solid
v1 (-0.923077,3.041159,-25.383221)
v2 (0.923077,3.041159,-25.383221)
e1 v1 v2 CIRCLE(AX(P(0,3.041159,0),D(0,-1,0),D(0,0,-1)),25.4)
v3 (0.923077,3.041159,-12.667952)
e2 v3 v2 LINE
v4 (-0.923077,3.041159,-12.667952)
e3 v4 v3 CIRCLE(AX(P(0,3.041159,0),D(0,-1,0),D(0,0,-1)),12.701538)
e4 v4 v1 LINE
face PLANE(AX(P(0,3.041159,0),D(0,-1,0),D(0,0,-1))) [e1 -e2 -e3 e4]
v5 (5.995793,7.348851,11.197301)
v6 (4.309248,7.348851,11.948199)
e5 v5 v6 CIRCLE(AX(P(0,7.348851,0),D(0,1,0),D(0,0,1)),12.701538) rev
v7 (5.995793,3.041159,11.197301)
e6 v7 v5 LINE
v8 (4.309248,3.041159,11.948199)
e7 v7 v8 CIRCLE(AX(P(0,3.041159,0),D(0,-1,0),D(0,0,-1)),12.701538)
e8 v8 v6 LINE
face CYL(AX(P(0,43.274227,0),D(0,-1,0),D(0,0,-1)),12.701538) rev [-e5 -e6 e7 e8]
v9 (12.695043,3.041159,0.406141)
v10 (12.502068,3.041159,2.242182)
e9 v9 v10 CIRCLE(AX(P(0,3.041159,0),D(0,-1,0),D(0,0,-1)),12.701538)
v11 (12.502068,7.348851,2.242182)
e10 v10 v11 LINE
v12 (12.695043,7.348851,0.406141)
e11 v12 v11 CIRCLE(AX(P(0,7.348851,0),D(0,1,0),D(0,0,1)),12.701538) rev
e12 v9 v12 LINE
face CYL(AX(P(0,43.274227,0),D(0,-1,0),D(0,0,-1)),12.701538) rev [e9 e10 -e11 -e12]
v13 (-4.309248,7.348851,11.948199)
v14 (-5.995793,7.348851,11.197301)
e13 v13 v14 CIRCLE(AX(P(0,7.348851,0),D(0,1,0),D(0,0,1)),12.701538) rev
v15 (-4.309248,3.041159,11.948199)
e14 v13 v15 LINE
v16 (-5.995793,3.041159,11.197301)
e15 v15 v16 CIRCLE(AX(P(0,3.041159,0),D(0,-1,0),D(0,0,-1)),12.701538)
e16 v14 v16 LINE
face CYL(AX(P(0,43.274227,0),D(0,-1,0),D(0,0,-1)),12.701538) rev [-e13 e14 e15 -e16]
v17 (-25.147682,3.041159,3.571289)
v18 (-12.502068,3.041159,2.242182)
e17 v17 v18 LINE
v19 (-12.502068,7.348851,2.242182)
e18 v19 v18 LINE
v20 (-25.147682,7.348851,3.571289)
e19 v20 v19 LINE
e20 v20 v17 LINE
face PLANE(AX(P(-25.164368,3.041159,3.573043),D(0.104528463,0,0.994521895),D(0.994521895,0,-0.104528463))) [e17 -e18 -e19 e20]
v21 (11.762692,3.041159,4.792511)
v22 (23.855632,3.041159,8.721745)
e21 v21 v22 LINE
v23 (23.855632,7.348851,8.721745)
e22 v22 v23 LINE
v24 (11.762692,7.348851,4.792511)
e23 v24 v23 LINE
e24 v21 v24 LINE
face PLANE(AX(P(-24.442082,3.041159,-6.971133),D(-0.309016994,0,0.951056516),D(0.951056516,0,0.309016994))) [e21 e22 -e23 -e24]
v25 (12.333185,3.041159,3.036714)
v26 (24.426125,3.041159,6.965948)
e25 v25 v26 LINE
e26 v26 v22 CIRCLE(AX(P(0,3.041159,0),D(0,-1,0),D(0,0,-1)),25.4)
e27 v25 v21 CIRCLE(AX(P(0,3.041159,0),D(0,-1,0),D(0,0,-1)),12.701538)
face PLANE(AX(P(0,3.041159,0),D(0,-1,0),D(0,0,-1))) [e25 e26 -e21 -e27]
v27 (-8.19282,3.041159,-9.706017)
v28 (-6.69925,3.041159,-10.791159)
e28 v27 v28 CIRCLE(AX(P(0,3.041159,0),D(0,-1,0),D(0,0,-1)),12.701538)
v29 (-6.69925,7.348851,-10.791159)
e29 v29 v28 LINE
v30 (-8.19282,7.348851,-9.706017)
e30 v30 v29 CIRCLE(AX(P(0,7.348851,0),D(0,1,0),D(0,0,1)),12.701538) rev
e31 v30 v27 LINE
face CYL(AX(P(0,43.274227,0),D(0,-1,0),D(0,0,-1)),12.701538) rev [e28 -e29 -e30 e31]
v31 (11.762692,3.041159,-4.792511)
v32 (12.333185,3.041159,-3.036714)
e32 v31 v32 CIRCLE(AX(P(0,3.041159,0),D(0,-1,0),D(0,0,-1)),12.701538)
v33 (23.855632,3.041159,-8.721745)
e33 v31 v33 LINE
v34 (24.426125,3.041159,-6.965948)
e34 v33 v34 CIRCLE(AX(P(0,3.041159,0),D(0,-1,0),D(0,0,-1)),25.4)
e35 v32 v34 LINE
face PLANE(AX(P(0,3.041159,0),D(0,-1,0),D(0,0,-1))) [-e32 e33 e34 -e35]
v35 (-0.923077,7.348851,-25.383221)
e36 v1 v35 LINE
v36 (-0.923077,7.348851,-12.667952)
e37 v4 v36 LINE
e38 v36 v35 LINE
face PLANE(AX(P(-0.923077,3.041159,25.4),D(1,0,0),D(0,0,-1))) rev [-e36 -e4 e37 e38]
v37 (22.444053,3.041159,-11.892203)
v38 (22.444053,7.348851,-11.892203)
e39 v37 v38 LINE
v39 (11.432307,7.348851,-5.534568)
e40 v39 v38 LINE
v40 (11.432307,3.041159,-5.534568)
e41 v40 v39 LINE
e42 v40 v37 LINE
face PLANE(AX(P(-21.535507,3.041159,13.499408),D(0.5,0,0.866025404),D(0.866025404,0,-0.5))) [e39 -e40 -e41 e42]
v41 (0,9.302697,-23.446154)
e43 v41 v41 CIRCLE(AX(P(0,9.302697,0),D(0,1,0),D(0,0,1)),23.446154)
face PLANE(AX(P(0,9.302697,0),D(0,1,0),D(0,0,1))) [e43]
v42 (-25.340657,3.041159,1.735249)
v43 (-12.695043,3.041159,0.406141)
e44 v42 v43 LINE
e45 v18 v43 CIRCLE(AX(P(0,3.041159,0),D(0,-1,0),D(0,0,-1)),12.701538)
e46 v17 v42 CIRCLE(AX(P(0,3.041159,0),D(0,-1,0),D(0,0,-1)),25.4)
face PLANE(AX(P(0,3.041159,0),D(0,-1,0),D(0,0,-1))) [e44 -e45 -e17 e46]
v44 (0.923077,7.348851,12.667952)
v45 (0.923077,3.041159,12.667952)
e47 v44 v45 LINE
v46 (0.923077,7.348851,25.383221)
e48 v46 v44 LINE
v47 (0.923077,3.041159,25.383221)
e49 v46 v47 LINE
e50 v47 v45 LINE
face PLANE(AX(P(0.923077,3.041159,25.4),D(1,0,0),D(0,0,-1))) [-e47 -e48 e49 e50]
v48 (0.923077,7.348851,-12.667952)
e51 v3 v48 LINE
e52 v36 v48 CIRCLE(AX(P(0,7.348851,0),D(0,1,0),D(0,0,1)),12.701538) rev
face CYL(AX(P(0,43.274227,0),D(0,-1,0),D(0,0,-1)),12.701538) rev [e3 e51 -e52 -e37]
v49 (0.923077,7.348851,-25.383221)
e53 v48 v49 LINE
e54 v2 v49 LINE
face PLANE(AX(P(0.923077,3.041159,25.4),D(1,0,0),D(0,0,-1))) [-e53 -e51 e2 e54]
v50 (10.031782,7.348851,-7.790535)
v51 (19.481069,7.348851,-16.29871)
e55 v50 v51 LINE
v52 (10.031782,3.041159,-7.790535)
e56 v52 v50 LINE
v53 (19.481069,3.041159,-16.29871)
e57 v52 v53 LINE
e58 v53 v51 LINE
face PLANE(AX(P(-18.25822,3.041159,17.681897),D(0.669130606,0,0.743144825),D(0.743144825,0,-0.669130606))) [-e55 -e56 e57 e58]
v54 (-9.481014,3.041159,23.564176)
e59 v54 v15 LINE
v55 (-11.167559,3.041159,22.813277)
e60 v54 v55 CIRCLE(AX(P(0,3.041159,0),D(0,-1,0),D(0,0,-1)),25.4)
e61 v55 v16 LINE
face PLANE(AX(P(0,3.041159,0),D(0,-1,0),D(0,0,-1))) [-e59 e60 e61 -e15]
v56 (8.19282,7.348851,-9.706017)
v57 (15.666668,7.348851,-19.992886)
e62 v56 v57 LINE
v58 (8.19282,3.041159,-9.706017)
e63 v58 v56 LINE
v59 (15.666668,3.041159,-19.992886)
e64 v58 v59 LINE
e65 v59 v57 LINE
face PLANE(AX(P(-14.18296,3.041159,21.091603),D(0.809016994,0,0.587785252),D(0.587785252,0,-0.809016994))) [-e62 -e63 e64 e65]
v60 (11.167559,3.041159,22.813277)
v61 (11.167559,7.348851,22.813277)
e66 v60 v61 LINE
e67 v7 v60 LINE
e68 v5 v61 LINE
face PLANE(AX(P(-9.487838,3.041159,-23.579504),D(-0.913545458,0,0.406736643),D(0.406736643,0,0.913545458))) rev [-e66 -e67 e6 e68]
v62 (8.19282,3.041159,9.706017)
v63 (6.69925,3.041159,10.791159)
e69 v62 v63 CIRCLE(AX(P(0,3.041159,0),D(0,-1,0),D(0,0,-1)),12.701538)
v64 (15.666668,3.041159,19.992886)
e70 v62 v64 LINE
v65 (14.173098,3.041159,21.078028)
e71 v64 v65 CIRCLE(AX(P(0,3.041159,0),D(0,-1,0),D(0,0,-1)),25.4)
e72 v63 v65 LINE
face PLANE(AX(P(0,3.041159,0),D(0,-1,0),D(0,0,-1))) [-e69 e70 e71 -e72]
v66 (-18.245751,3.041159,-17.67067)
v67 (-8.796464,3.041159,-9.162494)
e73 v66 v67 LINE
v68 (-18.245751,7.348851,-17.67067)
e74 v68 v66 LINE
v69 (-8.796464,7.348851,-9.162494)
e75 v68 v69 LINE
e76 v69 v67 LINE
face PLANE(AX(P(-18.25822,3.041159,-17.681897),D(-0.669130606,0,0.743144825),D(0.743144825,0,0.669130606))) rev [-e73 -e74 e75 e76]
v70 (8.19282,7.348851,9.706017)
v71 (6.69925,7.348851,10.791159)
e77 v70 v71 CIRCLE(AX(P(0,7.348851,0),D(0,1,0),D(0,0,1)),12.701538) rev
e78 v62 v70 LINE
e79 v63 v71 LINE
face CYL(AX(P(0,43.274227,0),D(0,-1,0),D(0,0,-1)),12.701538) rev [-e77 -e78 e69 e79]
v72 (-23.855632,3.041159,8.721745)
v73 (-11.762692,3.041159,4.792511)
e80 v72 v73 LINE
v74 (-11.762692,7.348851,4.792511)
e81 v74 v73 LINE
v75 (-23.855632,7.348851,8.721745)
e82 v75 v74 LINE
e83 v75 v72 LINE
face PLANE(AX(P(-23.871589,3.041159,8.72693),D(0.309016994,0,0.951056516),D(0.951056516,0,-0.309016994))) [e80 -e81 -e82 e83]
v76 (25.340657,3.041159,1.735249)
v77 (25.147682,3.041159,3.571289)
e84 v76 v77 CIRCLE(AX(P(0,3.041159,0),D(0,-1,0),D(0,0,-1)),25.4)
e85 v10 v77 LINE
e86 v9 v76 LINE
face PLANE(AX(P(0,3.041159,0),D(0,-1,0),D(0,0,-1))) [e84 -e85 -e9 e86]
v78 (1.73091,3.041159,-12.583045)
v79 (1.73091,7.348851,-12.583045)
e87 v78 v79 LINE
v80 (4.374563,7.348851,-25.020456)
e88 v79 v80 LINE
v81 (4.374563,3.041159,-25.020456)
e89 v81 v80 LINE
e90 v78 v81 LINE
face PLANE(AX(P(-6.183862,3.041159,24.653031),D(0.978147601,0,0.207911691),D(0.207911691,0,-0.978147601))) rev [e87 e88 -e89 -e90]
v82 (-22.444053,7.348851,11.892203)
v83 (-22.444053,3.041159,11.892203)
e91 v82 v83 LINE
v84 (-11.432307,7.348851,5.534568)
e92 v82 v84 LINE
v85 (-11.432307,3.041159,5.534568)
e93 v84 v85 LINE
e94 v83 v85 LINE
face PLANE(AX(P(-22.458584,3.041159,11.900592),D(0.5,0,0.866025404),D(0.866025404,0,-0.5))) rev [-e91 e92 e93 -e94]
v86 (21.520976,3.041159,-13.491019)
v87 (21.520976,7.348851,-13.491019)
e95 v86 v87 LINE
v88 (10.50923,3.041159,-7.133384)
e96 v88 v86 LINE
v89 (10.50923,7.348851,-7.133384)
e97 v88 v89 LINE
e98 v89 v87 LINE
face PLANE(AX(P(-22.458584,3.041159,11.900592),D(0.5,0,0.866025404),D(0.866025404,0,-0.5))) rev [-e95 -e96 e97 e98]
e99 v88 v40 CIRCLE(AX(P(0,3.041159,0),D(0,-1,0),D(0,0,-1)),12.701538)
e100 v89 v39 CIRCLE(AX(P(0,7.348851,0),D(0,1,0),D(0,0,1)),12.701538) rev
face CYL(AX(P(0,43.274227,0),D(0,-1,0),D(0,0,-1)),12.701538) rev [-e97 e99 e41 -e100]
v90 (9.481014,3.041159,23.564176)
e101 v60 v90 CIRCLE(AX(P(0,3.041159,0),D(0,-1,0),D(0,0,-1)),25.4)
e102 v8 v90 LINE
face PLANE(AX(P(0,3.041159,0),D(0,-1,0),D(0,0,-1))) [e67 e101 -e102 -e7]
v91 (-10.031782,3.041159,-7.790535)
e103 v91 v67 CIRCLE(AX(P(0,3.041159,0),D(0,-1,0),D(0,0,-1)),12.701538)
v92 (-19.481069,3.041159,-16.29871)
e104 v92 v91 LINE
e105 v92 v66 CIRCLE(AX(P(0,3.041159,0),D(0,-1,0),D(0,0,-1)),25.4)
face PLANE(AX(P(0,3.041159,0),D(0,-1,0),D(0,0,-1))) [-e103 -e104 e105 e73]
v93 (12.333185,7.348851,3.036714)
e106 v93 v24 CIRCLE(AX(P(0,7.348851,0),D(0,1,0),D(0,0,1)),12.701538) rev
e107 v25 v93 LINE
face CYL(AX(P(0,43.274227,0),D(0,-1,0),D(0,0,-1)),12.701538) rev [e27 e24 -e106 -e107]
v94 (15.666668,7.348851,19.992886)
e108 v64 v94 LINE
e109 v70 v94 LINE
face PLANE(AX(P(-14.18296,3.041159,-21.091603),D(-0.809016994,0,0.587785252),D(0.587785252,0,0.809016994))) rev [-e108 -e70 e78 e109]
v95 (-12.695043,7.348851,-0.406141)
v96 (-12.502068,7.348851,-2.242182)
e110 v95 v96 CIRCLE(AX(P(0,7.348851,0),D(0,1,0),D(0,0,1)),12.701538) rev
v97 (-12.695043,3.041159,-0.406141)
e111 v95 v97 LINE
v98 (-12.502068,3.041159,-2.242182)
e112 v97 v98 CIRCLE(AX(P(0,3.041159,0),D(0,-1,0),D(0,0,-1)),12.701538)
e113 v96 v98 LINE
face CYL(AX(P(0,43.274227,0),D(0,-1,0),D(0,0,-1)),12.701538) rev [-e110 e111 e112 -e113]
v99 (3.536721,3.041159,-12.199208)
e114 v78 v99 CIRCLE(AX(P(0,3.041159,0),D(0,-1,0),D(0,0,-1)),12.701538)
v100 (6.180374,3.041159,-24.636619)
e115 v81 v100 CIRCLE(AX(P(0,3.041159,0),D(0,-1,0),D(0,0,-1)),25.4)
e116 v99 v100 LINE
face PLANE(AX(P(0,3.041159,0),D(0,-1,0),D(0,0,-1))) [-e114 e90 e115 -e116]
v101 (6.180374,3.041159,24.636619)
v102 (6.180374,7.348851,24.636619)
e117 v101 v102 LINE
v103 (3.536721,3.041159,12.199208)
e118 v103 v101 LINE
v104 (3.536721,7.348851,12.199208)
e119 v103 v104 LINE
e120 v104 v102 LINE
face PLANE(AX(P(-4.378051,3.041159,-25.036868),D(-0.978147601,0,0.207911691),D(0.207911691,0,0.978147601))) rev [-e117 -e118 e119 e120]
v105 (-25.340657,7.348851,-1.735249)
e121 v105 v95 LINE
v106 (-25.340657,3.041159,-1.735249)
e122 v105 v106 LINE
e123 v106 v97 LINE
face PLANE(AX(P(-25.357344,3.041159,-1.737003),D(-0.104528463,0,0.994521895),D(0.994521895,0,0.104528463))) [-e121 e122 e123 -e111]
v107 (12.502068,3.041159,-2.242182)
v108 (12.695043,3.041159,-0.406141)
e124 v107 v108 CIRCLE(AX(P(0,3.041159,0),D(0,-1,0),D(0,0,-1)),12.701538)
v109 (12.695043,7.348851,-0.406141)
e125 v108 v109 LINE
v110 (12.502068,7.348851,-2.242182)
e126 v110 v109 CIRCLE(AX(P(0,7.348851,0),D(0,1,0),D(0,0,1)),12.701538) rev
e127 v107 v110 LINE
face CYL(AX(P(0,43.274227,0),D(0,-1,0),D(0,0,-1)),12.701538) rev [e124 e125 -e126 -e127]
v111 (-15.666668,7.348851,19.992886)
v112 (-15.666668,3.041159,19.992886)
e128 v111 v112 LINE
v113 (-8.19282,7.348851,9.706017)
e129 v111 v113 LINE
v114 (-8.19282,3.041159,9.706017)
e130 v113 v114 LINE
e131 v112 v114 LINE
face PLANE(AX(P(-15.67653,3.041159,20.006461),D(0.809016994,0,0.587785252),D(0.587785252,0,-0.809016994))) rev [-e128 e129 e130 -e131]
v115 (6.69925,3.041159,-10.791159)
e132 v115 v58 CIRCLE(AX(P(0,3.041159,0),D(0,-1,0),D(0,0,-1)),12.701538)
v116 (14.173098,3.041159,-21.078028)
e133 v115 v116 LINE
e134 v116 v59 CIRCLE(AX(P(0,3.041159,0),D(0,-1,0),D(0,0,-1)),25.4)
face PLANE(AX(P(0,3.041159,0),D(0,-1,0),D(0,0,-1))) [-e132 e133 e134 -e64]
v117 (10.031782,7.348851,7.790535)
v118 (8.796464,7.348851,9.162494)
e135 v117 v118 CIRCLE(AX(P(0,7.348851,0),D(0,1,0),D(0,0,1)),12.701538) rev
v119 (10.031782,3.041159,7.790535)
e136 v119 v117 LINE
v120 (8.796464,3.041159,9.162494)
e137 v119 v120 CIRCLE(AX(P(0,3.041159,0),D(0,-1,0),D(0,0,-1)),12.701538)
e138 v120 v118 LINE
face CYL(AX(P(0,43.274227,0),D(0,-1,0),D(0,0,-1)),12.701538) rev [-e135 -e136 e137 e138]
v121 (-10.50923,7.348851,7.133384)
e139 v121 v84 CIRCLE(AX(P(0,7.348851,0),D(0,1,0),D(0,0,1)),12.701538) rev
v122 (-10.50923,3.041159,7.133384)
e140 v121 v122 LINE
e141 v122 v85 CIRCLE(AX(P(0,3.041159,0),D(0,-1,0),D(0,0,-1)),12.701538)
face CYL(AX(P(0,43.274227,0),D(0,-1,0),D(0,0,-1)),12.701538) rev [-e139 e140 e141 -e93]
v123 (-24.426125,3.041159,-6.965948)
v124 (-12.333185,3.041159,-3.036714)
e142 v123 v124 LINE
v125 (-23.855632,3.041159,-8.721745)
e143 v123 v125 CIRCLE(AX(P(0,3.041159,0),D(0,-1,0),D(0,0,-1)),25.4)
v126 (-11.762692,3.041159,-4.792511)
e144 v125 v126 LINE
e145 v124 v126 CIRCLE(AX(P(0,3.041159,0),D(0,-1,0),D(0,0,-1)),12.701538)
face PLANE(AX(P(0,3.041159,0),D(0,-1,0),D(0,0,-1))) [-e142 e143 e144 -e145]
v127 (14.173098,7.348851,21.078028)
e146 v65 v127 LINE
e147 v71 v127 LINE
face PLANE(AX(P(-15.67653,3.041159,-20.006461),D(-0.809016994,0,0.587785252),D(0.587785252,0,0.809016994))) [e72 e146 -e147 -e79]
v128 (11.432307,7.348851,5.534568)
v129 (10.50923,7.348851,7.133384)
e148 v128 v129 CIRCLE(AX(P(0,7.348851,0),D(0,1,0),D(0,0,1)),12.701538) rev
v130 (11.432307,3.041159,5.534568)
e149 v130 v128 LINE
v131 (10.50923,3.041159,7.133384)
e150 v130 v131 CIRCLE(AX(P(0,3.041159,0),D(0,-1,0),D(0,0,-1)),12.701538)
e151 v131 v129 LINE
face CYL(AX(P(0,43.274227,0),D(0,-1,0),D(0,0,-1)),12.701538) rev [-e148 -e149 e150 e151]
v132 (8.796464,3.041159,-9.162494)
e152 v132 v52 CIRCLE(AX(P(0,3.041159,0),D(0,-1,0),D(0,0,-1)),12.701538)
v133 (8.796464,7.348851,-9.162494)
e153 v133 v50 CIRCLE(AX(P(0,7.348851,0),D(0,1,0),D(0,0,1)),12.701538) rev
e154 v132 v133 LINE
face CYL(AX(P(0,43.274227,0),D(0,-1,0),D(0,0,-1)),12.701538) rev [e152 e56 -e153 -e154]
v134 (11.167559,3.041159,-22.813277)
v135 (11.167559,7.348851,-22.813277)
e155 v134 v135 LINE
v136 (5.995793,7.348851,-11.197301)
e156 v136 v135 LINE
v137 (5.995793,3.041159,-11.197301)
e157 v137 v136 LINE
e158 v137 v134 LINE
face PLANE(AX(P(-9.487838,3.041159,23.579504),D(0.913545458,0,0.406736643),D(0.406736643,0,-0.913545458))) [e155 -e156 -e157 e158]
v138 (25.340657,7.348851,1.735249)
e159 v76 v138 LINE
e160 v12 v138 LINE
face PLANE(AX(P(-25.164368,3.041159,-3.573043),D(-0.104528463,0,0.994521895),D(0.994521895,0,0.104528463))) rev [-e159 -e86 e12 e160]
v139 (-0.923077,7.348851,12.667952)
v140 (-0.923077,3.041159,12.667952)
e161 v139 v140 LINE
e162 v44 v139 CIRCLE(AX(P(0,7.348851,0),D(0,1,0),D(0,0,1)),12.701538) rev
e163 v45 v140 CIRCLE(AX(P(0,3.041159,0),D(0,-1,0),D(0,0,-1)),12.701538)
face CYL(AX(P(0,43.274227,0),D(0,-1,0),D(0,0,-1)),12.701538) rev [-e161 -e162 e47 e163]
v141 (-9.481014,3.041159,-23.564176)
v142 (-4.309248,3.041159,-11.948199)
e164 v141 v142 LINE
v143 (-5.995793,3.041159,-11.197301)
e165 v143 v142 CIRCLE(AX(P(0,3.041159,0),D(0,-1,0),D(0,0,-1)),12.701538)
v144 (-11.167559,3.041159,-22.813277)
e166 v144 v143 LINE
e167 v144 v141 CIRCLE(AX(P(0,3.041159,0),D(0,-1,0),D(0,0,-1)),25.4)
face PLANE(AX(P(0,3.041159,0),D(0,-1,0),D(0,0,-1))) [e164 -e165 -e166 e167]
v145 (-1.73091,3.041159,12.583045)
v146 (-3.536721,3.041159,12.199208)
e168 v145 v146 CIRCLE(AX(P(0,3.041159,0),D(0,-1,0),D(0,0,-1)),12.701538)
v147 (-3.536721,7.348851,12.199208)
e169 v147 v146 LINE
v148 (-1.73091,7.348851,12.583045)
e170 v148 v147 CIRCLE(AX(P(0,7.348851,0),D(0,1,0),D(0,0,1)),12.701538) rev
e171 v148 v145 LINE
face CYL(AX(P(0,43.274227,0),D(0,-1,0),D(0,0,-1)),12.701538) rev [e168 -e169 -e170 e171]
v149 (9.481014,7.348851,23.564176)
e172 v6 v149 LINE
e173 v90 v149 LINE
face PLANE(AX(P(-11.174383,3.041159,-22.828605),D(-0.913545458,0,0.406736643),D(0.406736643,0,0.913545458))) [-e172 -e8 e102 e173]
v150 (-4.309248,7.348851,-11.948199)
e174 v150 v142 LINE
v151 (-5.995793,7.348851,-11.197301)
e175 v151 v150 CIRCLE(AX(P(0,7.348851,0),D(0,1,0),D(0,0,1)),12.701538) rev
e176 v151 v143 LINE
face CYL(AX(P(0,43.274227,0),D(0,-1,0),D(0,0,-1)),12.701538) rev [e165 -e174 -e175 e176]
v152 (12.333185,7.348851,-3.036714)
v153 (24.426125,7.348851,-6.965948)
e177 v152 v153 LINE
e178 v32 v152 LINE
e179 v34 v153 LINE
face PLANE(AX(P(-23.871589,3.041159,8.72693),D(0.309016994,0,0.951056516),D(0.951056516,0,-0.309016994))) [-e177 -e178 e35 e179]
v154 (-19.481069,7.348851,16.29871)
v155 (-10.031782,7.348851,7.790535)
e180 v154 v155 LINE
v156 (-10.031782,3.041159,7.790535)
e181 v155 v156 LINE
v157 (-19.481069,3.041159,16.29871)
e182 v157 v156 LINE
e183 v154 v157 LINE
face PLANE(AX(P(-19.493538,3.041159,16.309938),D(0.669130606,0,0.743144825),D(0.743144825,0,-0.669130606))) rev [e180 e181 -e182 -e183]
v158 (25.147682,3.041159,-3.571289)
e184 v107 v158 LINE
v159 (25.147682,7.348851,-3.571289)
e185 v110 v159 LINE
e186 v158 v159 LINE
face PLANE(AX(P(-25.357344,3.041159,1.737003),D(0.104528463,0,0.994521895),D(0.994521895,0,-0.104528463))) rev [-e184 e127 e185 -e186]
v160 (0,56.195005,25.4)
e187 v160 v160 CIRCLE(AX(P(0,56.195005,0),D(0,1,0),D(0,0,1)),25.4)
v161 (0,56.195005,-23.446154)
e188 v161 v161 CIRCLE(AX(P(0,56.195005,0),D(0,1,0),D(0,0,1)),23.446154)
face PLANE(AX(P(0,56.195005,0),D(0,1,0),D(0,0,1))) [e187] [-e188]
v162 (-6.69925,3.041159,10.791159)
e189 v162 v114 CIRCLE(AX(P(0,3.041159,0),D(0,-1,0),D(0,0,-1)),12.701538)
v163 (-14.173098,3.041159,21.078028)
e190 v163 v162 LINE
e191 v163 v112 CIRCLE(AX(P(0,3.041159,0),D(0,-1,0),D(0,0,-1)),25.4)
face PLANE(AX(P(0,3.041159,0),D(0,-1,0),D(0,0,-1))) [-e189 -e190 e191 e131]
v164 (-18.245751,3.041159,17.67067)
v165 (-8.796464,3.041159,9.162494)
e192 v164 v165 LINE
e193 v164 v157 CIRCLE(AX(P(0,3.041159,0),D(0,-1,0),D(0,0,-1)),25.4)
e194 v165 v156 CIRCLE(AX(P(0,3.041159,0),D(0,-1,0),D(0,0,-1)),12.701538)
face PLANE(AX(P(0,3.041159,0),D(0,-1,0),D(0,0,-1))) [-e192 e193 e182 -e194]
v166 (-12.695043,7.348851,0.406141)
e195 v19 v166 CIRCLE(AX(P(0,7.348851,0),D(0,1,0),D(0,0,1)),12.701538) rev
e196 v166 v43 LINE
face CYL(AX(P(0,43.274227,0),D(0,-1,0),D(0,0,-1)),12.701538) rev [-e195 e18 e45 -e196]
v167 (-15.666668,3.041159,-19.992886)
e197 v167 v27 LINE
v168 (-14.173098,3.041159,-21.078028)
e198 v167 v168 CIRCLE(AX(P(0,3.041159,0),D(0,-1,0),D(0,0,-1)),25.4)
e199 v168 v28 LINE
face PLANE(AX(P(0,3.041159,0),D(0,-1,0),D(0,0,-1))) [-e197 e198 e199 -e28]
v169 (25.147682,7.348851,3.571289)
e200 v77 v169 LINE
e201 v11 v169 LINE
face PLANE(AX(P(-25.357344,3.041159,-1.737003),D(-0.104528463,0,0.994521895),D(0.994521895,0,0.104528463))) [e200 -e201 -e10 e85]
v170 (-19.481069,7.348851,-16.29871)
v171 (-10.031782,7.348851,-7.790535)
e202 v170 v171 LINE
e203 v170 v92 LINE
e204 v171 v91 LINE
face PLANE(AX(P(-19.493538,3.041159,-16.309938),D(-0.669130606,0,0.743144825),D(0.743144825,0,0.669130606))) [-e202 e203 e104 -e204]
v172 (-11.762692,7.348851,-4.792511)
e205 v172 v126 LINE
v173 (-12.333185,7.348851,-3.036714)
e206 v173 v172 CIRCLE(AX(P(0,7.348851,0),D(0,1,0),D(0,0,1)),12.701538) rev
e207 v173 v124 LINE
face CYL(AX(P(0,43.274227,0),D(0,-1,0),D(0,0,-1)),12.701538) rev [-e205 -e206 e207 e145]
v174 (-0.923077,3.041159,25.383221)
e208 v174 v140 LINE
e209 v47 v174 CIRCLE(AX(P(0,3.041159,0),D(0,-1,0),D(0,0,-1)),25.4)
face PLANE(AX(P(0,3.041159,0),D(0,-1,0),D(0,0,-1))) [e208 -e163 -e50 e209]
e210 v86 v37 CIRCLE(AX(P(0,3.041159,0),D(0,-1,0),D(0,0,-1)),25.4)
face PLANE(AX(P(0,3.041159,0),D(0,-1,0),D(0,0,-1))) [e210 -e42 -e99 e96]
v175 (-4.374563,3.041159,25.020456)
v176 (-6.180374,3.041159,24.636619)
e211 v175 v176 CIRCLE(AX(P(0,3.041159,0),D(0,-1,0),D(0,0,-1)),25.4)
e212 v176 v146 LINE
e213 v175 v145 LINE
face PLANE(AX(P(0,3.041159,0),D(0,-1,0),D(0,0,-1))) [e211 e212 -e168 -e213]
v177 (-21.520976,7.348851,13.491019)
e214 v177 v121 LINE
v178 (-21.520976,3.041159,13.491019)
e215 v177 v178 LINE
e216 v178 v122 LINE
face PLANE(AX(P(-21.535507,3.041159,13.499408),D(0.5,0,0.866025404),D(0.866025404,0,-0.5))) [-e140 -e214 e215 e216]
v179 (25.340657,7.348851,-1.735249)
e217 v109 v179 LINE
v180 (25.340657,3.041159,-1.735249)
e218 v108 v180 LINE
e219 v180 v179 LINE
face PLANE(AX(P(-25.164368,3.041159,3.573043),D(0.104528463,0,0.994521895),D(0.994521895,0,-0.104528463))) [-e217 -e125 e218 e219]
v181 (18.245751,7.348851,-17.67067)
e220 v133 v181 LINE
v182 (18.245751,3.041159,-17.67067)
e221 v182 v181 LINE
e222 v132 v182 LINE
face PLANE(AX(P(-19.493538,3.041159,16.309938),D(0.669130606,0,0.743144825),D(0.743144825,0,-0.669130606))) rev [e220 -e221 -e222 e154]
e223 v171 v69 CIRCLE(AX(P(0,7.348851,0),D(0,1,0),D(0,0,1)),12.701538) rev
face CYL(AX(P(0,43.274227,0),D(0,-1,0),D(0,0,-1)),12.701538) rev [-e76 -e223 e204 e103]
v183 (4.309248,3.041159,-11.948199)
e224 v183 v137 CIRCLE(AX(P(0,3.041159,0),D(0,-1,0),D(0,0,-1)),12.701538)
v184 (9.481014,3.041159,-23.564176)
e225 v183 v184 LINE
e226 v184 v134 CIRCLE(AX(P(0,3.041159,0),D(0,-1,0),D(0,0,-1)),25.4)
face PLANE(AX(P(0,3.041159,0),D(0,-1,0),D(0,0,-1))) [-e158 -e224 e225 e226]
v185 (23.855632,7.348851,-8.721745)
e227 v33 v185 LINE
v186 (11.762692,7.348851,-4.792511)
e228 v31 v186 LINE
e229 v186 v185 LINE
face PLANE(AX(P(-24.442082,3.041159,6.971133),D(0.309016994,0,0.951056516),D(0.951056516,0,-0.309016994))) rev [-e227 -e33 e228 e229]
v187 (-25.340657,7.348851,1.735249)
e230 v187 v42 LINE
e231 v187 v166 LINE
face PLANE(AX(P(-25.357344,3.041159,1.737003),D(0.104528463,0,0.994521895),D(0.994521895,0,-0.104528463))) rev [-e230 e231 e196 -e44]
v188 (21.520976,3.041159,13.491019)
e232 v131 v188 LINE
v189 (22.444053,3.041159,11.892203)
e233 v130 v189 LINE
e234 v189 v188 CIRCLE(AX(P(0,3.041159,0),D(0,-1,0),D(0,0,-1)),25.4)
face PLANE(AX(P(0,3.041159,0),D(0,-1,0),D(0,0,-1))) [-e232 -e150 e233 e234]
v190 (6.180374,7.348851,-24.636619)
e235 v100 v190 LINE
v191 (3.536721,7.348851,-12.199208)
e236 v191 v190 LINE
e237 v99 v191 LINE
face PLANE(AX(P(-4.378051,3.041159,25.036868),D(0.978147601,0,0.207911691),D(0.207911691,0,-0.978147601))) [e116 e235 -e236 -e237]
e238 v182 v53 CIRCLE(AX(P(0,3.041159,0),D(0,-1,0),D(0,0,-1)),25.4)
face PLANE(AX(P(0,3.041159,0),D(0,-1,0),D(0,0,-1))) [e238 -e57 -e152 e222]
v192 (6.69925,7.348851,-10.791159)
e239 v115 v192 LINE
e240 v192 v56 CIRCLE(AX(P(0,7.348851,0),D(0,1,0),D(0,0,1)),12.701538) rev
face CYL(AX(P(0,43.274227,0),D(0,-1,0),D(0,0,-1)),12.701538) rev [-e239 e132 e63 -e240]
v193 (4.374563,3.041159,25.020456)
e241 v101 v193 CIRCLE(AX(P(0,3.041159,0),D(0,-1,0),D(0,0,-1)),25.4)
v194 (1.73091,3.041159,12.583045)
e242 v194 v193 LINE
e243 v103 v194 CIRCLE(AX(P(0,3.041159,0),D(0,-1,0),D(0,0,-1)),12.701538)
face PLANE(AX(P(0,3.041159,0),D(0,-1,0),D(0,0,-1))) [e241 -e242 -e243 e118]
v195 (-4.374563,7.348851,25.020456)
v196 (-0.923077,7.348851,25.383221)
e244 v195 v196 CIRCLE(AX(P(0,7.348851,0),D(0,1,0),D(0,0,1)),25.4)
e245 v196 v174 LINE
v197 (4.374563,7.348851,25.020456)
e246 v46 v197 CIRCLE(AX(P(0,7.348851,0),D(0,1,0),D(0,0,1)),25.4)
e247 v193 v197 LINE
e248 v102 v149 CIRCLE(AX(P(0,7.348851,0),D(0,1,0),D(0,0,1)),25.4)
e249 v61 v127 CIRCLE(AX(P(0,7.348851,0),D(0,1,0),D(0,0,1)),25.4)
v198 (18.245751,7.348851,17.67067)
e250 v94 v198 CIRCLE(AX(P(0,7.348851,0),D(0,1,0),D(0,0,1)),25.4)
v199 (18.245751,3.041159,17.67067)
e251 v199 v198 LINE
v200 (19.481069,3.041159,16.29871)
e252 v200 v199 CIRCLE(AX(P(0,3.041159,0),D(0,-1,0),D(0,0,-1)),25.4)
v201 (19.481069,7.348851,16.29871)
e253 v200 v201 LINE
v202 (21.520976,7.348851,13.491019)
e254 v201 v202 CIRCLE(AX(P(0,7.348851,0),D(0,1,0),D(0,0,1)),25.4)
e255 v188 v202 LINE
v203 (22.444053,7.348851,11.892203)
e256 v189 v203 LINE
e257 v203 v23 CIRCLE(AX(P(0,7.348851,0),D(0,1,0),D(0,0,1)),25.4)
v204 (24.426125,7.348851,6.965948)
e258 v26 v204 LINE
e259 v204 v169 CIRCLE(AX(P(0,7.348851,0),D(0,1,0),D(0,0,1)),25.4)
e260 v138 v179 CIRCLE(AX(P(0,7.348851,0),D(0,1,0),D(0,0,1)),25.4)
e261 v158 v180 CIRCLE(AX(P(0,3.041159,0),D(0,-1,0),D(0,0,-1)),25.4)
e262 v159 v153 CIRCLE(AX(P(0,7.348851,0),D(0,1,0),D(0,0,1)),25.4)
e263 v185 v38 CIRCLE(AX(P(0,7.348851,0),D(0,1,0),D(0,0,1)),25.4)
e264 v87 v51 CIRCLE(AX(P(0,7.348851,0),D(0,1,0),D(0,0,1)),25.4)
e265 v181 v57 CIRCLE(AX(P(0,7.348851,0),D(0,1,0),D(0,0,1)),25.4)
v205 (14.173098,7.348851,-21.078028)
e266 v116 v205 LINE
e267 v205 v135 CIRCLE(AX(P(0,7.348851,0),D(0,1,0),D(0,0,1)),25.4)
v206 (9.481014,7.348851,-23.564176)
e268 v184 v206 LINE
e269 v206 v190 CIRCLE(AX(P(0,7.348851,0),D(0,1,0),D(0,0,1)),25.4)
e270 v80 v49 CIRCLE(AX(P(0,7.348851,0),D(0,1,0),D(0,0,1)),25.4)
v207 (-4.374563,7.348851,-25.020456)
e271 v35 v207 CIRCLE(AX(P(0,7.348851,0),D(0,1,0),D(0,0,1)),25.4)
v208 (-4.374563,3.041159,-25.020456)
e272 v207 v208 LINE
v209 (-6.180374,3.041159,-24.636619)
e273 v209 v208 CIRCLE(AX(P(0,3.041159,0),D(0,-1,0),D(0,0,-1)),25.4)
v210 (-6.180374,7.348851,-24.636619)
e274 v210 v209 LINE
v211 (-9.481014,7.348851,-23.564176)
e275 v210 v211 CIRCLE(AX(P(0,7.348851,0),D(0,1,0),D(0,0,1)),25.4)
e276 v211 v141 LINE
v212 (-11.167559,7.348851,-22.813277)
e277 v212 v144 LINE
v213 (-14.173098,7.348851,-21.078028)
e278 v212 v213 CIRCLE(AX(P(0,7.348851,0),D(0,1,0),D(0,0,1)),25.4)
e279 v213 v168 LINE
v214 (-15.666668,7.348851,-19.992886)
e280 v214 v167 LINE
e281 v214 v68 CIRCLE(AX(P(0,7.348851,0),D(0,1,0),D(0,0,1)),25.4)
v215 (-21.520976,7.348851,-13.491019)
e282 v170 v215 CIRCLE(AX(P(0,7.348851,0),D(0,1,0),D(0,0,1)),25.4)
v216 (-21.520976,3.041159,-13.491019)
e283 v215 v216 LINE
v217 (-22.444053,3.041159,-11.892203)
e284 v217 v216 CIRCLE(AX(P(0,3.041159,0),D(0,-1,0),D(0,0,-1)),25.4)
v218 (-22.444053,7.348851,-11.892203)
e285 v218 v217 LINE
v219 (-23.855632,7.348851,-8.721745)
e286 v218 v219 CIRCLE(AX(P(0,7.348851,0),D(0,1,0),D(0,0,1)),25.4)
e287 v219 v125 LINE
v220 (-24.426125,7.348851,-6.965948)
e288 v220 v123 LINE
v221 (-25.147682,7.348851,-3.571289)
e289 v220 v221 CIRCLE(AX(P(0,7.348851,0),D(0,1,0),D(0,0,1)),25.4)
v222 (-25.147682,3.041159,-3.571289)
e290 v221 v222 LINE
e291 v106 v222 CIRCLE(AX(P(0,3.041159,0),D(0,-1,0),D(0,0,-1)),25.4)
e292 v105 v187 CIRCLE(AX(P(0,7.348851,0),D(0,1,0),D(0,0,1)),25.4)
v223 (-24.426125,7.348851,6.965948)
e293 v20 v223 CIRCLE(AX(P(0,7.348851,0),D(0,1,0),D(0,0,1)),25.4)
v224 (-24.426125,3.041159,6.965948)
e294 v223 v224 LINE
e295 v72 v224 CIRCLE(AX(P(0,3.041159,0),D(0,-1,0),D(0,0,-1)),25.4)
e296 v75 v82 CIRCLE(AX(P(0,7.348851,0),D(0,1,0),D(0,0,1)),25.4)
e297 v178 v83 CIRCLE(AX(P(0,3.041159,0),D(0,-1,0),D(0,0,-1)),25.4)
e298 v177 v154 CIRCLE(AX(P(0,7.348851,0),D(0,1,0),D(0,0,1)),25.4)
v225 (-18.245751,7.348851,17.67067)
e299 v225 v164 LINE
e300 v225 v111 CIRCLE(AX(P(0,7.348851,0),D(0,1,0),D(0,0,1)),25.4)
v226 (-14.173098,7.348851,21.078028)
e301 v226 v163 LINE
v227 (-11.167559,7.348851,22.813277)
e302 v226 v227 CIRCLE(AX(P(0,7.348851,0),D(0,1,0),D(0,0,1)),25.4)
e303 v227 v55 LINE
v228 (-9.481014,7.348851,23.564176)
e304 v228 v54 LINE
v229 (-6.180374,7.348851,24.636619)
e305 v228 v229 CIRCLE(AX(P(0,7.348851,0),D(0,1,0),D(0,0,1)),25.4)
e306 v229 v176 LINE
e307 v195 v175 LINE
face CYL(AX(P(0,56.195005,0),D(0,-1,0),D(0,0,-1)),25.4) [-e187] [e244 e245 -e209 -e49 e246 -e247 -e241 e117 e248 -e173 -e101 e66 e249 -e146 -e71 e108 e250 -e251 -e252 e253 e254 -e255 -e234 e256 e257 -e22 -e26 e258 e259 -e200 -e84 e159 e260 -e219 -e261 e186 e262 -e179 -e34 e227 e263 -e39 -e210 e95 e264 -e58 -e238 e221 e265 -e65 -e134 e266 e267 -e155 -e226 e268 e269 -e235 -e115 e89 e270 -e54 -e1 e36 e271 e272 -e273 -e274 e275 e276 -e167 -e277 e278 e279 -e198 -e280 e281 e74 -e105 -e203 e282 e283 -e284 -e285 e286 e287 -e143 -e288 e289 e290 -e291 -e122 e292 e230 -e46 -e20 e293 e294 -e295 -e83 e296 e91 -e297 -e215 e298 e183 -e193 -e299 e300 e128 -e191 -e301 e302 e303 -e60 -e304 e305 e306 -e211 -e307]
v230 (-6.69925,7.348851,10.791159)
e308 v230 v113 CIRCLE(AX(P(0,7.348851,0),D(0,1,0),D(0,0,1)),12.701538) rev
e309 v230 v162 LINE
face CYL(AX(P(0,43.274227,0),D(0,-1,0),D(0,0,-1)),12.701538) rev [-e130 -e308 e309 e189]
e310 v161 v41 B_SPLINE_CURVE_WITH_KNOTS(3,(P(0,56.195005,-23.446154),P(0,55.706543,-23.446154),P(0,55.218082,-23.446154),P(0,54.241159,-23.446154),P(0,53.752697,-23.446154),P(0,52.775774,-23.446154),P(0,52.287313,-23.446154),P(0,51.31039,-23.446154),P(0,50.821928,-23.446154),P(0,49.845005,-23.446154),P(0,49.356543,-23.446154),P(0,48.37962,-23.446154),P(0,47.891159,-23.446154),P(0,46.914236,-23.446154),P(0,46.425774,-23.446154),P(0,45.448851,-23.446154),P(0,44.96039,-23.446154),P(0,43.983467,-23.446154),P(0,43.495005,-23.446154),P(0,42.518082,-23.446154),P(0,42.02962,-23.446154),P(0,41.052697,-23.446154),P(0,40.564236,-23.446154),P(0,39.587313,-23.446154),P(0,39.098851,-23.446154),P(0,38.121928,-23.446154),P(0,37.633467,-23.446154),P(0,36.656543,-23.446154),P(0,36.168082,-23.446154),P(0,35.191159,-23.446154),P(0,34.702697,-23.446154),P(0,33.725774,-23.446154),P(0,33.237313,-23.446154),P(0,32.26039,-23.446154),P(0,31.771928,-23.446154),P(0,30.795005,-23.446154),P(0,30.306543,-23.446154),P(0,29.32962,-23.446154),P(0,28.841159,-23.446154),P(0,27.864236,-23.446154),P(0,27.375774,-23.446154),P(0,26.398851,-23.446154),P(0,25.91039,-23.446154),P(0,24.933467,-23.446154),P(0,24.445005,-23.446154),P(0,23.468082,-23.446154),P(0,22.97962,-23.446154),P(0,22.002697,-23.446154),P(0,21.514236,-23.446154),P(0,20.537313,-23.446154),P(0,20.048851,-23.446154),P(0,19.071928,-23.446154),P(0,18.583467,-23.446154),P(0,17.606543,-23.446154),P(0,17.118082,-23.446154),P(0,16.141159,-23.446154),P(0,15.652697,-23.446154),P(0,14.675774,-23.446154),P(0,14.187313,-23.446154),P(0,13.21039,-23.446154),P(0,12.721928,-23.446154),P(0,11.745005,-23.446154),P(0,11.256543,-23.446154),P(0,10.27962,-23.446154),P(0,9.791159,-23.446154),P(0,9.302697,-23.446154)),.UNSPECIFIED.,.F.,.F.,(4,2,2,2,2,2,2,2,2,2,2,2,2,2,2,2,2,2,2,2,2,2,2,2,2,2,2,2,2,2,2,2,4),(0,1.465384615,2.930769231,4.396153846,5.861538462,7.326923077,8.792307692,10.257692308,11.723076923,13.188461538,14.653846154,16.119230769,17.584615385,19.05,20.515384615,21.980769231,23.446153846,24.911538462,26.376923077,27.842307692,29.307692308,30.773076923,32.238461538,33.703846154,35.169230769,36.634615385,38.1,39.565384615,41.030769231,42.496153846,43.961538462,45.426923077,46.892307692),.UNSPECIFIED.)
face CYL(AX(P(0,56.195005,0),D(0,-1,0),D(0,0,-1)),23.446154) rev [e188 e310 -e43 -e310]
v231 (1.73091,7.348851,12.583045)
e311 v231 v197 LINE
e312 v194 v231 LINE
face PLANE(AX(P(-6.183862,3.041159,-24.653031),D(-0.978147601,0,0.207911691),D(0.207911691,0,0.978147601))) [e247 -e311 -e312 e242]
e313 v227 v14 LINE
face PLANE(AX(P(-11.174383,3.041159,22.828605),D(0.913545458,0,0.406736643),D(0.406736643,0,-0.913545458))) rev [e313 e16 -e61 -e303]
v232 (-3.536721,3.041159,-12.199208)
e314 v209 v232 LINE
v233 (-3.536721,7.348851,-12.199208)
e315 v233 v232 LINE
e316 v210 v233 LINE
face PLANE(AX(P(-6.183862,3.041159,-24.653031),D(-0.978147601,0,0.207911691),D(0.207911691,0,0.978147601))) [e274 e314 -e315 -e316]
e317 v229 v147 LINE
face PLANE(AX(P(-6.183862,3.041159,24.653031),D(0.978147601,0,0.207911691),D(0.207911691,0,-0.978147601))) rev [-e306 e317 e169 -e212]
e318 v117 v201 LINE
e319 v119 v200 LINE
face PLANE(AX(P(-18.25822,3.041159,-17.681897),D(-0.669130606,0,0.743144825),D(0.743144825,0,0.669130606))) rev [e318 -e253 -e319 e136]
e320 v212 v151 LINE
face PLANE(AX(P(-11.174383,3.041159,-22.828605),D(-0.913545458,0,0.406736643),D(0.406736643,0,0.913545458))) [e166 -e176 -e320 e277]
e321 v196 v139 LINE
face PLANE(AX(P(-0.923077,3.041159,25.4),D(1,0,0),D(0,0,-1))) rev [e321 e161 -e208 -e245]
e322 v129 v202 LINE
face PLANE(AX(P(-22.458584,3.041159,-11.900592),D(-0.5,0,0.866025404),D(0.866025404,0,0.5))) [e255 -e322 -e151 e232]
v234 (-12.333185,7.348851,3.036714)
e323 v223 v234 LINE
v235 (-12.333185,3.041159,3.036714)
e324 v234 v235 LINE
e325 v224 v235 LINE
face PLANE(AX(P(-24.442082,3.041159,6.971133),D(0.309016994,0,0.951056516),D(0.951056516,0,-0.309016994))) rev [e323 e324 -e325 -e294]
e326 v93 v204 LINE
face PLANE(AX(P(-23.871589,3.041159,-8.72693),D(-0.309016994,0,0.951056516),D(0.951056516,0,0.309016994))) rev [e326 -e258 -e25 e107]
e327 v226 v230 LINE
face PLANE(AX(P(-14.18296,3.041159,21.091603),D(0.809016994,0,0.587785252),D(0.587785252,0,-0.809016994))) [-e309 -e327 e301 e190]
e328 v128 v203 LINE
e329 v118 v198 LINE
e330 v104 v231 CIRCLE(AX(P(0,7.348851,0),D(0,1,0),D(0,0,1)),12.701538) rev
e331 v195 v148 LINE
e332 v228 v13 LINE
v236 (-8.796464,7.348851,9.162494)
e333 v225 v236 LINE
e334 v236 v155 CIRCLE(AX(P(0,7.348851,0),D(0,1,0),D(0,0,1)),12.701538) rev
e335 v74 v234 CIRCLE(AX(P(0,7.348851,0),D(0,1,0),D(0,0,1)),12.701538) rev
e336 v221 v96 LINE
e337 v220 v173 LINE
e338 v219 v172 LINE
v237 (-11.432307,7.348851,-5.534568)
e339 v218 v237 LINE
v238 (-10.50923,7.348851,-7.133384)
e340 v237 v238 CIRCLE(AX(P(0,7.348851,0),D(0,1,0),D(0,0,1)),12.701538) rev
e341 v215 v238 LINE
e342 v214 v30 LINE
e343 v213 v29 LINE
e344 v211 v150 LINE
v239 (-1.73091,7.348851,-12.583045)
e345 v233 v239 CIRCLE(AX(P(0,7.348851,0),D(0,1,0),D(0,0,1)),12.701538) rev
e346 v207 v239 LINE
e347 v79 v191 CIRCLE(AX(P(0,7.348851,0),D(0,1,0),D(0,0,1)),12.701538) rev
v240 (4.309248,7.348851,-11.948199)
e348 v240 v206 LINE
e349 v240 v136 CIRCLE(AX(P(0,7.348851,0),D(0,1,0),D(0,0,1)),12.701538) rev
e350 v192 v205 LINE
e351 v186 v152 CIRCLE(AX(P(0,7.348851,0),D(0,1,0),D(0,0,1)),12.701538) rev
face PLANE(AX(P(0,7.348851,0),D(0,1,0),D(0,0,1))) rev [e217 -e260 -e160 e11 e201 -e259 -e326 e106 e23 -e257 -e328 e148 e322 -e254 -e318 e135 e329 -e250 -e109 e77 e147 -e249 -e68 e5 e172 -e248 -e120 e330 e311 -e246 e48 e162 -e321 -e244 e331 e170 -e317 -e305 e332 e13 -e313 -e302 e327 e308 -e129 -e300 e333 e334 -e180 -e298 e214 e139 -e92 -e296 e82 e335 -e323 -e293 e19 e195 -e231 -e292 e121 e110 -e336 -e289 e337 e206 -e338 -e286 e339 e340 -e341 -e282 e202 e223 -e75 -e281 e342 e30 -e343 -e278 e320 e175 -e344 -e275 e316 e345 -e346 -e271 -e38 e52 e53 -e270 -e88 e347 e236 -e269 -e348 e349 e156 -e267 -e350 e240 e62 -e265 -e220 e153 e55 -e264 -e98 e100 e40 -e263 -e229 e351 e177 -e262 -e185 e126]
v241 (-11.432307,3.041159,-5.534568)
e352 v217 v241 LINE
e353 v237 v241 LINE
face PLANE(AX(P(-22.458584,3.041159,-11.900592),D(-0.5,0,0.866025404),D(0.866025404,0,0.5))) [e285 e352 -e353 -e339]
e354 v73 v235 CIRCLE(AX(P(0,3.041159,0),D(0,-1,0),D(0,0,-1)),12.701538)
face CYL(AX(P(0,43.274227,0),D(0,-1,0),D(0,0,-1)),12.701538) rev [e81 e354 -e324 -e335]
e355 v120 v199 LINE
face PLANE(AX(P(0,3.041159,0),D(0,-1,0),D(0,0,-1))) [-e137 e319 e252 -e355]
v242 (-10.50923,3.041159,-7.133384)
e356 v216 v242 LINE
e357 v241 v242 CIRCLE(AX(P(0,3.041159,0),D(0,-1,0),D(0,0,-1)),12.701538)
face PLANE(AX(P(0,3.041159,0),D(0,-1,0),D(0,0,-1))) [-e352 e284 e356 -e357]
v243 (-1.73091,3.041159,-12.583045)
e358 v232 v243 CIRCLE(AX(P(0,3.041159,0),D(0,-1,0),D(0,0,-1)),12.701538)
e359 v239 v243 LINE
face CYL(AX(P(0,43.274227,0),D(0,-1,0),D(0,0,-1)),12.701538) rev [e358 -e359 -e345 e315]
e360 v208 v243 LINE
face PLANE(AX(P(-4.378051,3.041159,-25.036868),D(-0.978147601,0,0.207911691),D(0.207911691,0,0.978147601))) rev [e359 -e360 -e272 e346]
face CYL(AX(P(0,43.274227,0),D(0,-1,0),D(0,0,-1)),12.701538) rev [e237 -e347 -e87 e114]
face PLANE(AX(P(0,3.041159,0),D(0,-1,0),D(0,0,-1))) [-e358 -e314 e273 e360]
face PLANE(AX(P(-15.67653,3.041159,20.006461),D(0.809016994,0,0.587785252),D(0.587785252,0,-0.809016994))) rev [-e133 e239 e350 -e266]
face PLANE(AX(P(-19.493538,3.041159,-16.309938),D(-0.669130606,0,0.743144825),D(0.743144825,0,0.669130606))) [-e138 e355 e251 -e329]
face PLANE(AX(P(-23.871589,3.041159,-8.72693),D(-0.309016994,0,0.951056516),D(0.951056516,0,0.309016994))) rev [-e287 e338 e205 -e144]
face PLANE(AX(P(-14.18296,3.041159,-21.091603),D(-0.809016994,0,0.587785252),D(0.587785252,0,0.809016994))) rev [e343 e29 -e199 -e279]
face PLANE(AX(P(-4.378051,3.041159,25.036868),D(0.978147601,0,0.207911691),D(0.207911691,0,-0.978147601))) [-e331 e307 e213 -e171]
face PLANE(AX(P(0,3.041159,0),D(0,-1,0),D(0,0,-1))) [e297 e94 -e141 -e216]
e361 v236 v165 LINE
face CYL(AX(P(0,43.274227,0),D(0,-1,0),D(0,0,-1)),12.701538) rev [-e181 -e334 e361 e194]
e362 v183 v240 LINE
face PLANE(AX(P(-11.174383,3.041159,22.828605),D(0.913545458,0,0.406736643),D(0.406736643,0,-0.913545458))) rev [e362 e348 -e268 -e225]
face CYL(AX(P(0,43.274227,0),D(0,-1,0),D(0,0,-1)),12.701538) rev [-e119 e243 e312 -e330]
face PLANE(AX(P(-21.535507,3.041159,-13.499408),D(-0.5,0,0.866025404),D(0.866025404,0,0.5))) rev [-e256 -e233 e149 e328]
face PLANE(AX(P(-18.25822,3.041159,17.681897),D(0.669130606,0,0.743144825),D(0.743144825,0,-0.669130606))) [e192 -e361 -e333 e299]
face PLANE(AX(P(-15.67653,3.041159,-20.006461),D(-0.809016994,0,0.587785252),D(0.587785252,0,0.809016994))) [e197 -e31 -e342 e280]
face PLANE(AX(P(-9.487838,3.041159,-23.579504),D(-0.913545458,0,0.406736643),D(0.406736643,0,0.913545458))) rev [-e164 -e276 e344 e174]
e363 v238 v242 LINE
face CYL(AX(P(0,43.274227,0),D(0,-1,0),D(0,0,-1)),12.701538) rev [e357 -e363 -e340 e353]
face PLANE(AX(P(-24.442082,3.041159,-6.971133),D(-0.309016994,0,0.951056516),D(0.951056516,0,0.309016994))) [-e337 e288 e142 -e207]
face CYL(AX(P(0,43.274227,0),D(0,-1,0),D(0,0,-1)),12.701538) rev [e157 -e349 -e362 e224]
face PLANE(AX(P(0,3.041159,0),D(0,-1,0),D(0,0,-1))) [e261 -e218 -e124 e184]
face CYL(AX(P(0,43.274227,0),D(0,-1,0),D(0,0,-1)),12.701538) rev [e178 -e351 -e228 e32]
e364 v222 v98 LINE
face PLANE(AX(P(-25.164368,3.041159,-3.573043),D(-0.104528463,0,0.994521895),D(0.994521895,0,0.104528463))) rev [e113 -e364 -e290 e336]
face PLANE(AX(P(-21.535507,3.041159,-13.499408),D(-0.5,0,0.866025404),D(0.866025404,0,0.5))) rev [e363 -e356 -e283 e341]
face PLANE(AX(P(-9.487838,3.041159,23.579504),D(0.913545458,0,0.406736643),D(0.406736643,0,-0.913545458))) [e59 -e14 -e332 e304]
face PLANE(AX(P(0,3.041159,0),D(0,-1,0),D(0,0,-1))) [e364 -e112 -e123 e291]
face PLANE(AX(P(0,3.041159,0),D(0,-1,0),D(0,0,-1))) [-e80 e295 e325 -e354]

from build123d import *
from build123d.topology import SkipClean

# Parameters (mm, degrees)
SKETCH1_R               = 38.1
BOSS_EXTRUDE1_DEPTH     = 76.2
SHELL2_T                = 3.175
BOSS_EXTRUDE2_DEPTH     = 7
CUT_EXTRUDE1_DEPTH      = 99.527366122
CUT_EXTRUDE1_DEPTH_BACK = 99.527366122
SKETCH3_R               = 61.906276858
SKETCH3_R_2             = 41.275
SKETCH4_R               = 20.64
CUT_EXTRUDE2_DEPTH      = 7
SCALE1_SCALE            = 0.615384615


# Read off the part's stored shape, not the designer's step: Boss-Extrude2
with BuildPart() as part:
    # Sketch1 → Boss-Extrude1 (new body)
    with BuildSketch(Plane(origin=(0, 0, 0), x_dir=(1, 0, 0), z_dir=(0, 1, 0))):
        with Locations(Location((0, 0, 0), (0, 0, 90))):
            Circle(SKETCH1_R)
    extrude(amount=BOSS_EXTRUDE1_DEPTH)

    # Shell2
    shell2_openings = [part.faces().sort_by_distance(p)[0] for p in [
        (0, 76.2, 0),
    ]]
    offset(amount=SHELL2_T, openings=shell2_openings, kind=Kind.INTERSECTION)

    # Boss-Extrude2 outline → Boss-Extrude2 (add)
    with BuildSketch(Plane(origin=(0, -3.175, 0), x_dir=(-1, 0, 0), z_dir=(0, -1, 0))):
        Polygon((1.5, 14.271546681), (1.5, 41.275), (-1.5, 41.275), (-1.5, 14.271546681), (-7.114333637, 40.684909757), (-10.04877644, 40.061174684), (-4.434442802, 13.647811609), (-15.417736756, 38.316693729), (-18.158373129, 37.0964838), (-7.175079175, 12.42760168), (-23.047310797, 34.273854321), (-25.47436178, 32.510498564), (-9.602130158, 10.664245923), (-29.669606762, 28.733083016), (-31.676998581, 26.503648539), (-11.609521977, 8.434811446), (-34.995198541, 21.936538106), (-36.495198541, 19.338461894), (-13.109521977, 5.836735235), (-38.791332219, 14.181261217), (-39.718383202, 11.328091668), (-14.03657296, 2.983565686), (-40.892098536, 5.806195164), (-41.205683926, 2.822629478), (-14.35015835, 0), (-41.205683926, -2.822629478), (-40.892098536, -5.806195164), (-14.03657296, -2.983565686), (-39.718383202, -11.328091668), (-38.791332219, -14.181261217), (-13.109521977, -5.836735235), (-36.495198541, -19.338461894), (-34.995198541, -21.936538106), (-11.609521977, -8.434811446), (-31.676998581, -26.503648539), (-29.669606762, -28.733083016), (-9.602130158, -10.664245923), (-25.47436178, -32.510498564), (-23.047310797, -34.273854321), (-7.175079175, -12.42760168), (-18.158373129, -37.0964838), (-15.417736756, -38.316693729), (-4.434442802, -13.647811609), (-10.04877644, -40.061174684), (-7.114333637, -40.684909757), (-1.5, -14.271546681), (-1.5, -41.275), (1.5, -41.275), (1.5, -14.271546681), (7.114333637, -40.684909757), (10.04877644, -40.061174684), (4.434442802, -13.647811609), (15.417736756, -38.316693729), (18.158373129, -37.0964838), (7.175079175, -12.42760168), (23.047310797, -34.273854321), (25.47436178, -32.510498564), (9.602130158, -10.664245923), (29.669606762, -28.733083016), (31.676998581, -26.503648539), (11.609521977, -8.434811446), (34.995198541, -21.936538106), (36.495198541, -19.338461894), (13.109521977, -5.836735235), (38.791332219, -14.181261217), (39.718383202, -11.328091668), (14.03657296, -2.983565686), (40.892098536, -5.806195164), (41.205683926, -2.822629478), (14.35015835, 0), (41.205683926, 2.822629478), (40.892098536, 5.806195164), (14.03657296, 2.983565686), (39.718383202, 11.328091668), (38.791332219, 14.181261217), (13.109521977, 5.836735235), (36.495198541, 19.338461894), (34.995198541, 21.936538106), (11.609521977, 8.434811446), (31.676998581, 26.503648539), (29.669606762, 28.733083016), (9.602130158, 10.664245923), (25.47436178, 32.510498564), (23.047310797, 34.273854321), (7.175079175, 12.42760168), (18.158373129, 37.0964838), (15.417736756, 38.316693729), (4.434442802, 13.647811609), (10.04877644, 40.061174684), (7.114333637, 40.684909757), align=None)
    extrude(amount=BOSS_EXTRUDE2_DEPTH)

    # Sketch3 → Cut-Extrude1 (cut, two sides: drawn at the far end of the back side and taken through both)
    with SkipClean():  # the faces are left unmerged after this step: merging them gives an invalid solid
        with BuildSketch(Plane.XZ.offset(3.175).offset(-CUT_EXTRUDE1_DEPTH_BACK)):
            Circle(SKETCH3_R)
            with Locations(Location((0, 0, 0), (0, 0, 272.082679548))):
                Circle(SKETCH3_R_2, mode=Mode.SUBTRACT)
        extrude(amount=CUT_EXTRUDE1_DEPTH + CUT_EXTRUDE1_DEPTH_BACK, mode=Mode.SUBTRACT)

    # Sketch4 → Cut-Extrude2 (cut)
    with SkipClean():  # the faces are left unmerged after this step: merging them gives an invalid solid
        with BuildSketch(Plane.XZ.offset(10.175)):
            Circle(SKETCH4_R)
        extrude(amount=-CUT_EXTRUDE2_DEPTH, mode=Mode.SUBTRACT)


with BuildPart() as part_1:
    # Scale1: scaled about (0, 24.187012891, 0)
    add(part.part.scale(SCALE1_SCALE).moved(Location((0, 9.302697266, 0))))


solid = part_1.part
